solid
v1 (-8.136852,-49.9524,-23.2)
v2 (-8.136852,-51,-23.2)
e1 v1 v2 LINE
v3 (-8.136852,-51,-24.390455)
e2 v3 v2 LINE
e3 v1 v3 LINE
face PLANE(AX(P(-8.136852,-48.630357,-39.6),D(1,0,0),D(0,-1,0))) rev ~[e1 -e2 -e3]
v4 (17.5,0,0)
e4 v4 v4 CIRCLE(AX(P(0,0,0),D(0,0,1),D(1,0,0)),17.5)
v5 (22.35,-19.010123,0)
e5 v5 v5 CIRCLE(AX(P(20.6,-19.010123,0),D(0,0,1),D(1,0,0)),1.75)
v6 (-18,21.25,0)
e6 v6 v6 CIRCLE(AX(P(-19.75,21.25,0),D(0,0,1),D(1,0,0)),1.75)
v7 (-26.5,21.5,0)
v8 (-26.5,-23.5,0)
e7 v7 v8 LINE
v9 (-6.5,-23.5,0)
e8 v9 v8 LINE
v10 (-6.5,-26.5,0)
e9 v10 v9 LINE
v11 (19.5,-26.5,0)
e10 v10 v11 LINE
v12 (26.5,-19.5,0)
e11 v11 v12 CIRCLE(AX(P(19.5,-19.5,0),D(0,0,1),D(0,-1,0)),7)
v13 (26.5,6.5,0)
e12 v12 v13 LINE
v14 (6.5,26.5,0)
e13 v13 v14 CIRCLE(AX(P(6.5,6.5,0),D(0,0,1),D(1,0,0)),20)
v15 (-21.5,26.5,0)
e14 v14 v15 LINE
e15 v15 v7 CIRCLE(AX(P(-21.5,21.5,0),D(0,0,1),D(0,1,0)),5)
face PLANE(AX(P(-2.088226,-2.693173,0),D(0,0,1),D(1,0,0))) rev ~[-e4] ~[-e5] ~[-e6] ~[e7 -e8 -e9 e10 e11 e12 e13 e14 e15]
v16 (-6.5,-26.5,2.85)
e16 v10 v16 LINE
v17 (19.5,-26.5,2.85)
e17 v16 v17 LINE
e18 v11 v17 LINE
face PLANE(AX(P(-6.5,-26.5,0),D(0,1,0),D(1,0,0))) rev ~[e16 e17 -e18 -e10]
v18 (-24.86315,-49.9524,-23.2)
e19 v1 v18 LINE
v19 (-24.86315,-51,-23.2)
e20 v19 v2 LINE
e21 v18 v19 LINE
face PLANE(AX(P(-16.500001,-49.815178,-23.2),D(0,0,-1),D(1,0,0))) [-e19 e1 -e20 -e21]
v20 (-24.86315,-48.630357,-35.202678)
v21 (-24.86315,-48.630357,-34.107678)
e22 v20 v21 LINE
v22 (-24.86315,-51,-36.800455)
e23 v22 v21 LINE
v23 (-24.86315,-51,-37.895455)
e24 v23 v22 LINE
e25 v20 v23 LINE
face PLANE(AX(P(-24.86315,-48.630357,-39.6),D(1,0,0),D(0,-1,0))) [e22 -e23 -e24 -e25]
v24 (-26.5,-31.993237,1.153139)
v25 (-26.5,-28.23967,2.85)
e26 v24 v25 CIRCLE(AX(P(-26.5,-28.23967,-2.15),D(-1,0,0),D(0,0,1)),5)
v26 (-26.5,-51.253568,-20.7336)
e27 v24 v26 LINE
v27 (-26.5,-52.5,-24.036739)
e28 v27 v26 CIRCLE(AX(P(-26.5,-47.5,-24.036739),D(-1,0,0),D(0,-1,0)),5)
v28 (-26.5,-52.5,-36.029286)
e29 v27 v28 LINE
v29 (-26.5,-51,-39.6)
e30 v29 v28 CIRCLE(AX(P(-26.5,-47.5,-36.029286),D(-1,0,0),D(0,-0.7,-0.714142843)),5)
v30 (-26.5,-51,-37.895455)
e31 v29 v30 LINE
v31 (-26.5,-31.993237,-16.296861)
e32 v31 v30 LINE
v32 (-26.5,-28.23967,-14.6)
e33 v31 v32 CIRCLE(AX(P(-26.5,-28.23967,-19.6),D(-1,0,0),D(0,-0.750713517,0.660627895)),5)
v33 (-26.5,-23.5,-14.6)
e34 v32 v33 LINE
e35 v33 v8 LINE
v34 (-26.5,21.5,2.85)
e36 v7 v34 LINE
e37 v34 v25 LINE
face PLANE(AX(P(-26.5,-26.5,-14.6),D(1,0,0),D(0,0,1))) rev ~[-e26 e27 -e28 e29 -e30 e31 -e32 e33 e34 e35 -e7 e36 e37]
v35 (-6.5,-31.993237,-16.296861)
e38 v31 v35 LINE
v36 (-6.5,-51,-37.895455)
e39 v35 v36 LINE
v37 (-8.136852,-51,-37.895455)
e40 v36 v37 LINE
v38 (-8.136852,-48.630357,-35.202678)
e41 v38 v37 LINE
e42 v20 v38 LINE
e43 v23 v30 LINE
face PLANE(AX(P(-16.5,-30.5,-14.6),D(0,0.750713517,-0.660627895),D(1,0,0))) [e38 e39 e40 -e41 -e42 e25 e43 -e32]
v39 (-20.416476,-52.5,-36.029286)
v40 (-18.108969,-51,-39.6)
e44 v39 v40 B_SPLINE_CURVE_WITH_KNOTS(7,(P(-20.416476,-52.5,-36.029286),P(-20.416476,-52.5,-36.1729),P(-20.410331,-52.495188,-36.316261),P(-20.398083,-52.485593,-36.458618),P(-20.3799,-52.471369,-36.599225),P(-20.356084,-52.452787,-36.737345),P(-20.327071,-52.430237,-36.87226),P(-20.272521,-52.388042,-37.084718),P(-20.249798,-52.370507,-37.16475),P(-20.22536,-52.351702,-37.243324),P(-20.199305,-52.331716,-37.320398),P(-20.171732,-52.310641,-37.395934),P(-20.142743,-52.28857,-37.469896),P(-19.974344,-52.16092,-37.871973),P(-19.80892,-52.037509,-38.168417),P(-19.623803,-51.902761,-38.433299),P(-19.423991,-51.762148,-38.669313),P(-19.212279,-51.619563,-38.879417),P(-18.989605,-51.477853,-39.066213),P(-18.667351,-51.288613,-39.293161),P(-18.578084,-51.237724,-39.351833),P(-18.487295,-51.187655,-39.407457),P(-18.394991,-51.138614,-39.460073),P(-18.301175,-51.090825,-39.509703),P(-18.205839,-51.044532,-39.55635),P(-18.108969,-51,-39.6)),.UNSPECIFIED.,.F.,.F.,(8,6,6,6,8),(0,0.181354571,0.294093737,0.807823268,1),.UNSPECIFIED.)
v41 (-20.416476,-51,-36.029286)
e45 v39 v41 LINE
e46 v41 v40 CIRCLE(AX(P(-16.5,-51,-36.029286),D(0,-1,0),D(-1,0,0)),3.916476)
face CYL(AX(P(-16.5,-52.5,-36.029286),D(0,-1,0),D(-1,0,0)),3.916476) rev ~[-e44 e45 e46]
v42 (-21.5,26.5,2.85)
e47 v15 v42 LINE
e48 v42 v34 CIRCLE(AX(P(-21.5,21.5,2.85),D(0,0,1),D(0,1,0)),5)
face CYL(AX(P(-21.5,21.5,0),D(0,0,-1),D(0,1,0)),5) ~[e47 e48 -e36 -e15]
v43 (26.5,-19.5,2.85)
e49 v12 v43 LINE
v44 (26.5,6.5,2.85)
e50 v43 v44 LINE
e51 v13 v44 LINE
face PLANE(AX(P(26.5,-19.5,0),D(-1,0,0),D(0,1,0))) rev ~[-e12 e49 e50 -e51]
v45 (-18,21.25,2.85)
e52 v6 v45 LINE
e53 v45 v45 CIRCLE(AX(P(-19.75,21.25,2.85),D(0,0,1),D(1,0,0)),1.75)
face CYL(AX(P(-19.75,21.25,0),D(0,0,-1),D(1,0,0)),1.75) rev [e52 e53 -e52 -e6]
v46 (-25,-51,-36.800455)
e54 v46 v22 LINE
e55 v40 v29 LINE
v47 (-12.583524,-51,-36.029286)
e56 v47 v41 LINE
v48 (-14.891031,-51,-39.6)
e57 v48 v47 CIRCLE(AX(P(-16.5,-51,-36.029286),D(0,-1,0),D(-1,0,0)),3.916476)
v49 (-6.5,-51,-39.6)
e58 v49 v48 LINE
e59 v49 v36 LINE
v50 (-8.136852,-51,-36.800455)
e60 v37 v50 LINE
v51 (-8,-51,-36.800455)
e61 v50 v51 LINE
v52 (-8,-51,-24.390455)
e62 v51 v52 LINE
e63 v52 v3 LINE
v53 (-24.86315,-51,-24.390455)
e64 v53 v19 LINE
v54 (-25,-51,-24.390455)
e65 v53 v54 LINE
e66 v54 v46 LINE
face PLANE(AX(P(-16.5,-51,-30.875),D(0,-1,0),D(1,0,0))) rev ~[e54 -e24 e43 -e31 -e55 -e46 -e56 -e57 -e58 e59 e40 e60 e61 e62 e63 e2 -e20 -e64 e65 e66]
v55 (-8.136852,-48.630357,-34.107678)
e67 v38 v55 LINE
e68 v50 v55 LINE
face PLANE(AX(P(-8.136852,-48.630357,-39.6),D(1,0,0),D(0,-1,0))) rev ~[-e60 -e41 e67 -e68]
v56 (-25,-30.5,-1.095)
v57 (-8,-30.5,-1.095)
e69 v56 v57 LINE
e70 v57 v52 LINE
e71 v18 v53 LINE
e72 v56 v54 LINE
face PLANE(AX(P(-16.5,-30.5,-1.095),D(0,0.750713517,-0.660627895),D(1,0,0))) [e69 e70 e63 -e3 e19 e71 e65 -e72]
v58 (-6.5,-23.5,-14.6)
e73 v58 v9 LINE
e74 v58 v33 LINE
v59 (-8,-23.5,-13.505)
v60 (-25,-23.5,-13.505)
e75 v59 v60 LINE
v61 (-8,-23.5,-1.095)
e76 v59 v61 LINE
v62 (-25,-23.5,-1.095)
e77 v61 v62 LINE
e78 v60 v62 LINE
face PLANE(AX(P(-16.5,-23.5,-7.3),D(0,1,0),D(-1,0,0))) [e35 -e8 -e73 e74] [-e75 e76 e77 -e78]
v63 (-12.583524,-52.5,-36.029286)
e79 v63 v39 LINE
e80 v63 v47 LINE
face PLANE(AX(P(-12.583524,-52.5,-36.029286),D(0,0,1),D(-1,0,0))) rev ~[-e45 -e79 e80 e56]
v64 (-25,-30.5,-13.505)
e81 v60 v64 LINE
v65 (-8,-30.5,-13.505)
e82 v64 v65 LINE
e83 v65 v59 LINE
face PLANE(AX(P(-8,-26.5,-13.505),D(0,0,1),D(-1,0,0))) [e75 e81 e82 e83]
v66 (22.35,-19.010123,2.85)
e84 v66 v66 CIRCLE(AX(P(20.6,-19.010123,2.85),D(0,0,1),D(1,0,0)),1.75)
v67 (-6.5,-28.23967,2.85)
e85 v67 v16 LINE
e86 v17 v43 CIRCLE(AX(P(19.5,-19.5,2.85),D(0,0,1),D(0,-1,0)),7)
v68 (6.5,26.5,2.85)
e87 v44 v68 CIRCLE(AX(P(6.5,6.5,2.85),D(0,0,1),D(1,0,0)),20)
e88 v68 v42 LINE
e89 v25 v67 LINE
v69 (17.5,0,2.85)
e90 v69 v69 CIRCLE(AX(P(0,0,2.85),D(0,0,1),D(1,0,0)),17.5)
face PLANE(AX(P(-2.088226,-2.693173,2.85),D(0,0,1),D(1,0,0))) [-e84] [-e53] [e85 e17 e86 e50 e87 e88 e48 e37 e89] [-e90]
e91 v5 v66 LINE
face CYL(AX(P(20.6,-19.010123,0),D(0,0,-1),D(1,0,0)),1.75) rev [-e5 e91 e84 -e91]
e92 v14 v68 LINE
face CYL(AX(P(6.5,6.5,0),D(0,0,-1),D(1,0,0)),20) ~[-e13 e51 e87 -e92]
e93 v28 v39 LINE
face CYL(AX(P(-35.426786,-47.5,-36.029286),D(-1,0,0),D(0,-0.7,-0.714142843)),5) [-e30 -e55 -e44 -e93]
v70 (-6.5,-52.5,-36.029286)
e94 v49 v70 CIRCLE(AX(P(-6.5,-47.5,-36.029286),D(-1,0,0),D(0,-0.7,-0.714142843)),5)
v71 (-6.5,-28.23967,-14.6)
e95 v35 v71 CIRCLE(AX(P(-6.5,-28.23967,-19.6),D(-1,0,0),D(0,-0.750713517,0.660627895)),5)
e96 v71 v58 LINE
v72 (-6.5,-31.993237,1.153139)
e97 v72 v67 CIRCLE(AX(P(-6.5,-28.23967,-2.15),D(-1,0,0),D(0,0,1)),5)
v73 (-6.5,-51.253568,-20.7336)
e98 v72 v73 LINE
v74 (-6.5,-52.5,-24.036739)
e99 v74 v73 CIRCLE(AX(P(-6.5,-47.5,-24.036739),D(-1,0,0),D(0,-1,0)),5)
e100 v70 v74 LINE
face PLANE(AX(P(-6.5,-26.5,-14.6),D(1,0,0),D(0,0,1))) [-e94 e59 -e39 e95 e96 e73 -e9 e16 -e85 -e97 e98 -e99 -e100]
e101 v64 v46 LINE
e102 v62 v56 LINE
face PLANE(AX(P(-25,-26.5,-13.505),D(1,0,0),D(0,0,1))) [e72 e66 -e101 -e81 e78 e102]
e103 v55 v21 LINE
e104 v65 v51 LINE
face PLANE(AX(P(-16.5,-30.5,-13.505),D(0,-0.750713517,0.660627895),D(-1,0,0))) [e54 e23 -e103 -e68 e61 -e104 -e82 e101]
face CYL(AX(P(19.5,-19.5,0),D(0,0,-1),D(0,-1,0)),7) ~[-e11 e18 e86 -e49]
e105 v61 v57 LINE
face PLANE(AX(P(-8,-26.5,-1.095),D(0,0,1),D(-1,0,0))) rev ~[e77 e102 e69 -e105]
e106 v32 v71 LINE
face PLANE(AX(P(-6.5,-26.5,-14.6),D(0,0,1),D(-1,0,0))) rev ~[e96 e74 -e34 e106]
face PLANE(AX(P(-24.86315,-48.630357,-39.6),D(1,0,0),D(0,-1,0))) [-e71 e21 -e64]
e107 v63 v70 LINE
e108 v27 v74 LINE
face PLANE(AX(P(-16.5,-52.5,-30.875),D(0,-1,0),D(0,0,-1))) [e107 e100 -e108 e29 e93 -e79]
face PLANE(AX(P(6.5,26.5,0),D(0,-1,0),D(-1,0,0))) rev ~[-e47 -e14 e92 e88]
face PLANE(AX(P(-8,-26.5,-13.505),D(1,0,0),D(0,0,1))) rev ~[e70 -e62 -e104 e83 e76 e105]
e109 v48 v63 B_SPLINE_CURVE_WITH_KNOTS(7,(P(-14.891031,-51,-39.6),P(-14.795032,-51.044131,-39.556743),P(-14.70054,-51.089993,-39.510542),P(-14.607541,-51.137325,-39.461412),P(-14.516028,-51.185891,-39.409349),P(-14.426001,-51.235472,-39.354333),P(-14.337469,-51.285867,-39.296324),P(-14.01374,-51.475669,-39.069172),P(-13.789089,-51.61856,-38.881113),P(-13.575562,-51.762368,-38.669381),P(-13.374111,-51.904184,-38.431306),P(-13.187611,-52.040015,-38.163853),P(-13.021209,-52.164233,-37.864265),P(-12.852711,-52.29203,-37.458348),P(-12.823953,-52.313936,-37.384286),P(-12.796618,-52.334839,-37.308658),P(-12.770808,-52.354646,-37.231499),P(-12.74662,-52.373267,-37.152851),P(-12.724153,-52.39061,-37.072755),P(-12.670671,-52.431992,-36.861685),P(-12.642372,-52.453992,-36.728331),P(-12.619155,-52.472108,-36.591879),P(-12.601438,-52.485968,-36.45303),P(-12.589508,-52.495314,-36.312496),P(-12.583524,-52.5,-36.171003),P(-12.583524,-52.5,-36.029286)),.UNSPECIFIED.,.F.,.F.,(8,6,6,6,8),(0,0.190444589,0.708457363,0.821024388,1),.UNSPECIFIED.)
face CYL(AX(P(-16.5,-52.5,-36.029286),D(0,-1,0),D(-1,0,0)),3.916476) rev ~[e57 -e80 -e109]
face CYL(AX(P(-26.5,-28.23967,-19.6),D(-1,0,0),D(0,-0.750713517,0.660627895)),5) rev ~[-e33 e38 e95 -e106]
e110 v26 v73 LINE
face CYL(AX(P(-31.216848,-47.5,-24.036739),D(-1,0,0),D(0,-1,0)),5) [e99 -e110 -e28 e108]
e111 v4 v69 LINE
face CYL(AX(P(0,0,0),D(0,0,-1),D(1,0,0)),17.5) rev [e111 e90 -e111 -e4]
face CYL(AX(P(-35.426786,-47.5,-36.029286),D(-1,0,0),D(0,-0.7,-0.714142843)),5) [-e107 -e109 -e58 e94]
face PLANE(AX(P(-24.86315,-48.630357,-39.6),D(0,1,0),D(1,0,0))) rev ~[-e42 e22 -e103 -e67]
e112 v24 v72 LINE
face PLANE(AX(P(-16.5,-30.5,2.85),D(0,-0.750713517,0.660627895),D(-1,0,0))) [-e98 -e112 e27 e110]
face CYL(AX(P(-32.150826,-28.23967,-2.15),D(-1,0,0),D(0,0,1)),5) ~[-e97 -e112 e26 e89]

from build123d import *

# Parameters (mm, degrees)
F0_R         = 1.75
F0_R_2       = 17.5
F1_DEPTH     = 2.85
F2_W         = 20
F2_H         = 4
F3_DEPTH     = 14.6
F4_W         = 17
F4_H         = 12.41
F5_DEPTH     = 25
F3_FACE1_W   = 20
F3_FACE1_H   = 17.45
F3_FACE1_W_2 = 17
F3_FACE1_H_2 = 12.41
F9_W         = 20
F9_H         = 17.45
F10_DEPTH    = 1.5
F11_W        = 16.7262982869
F11_H        = 2.3696432114
F12_DEPTH    = 16.4
F13_T1_DEPTH = 20
F13_T3_DEPTH = 31.3016516107
F13_T5_DEPTH = 29.4336950122
F13_T7_DEPTH = 37.8535710714
F4_W_2       = 20
F4_H_2       = 14.6
F14_DEPTH    = 3
F16_DEPTH    = 25


# Not quite as in the source:
# - a fillet or chamfer that OpenCascade refuses, or shapes differently, is made with other operations: its cross-section is extruded or revolved along the edge and cut away or added


with BuildPart() as f1:
    # F0 (on Top) → F1 (new body)
    with BuildSketch(Plane.XY):
        with BuildLine():
            Line((-6.5, -26.5), (19.5, -26.5))
            ThreePointArc((19.5, -26.5), (24.4497474683, -24.4497474683), (26.5, -19.5))
            Line((26.5, -19.5), (26.5, 6.5))
            ThreePointArc((26.5, 6.5), (20.6421356237, 20.6421356237), (6.5, 26.5))
            Line((6.5, 26.5), (-21.5, 26.5))
            ThreePointArc((-21.5, 26.5), (-25.0355339059, 25.0355339059), (-26.5, 21.5))
            Line((-26.5, 21.5), (-26.5, -26.5))
            Line((-26.5, -26.5), (-26.5, -30.5))
            Line((-26.5, -30.5), (-6.5, -30.5))
            Line((-6.5, -30.5), (-6.5, -26.5))
        make_face()
        with Locations((20.6, -19.0101229506)):
            Circle(F0_R, mode=Mode.SUBTRACT)
        with Locations((-19.75, 21.25)):
            Circle(F0_R, mode=Mode.SUBTRACT)
        Circle(F0_R_2, mode=Mode.SUBTRACT)
    extrude(amount=F1_DEPTH)

    # F2 (on face) → F3 (join)
    with BuildSketch(Plane(origin=(0, 0, 0), x_dir=(1, 0, 0), z_dir=(0, 0, -1))):
        with Locations((-16.5, 28.5)):
            Rectangle(F2_W, F2_H)
    extrude(amount=F3_DEPTH)

    # F4 (on face) → F5 (cut)
    with BuildSketch(Plane(origin=(0, -26.5, 0), x_dir=(-1, 0, 0), z_dir=(0, 1, 0))):
        with Locations((16.5, -7.3)):
            Rectangle(F4_W, F4_H)
    extrude(amount=-F5_DEPTH, mode=Mode.SUBTRACT)

    # F8: sweep along a path in F7
    with BuildLine(Plane.YZ.offset(-16.5)) as f8_path:
        Line((-30.5838297752, -0.1396118733), (-52.5838297752, -25.1396118733))
    # F3_face1 (on face) → F8 (sweep)
    with BuildSketch(Plane(origin=(-16.5, -30.5, -3.6969789176), x_dir=(1, 0, 0), z_dir=(0, -1, 0))):
        with Locations((0, -2.1780210824)):
            Rectangle(F3_FACE1_W, F3_FACE1_H)
        with Locations((0, -3.6030210824)):
            Rectangle(F3_FACE1_W_2, F3_FACE1_H_2, mode=Mode.SUBTRACT)
    sweep(path=f8_path.line)

    # F9 (on face) → F10 (join)
    with BuildSketch(Plane.XZ.offset(52.5)):
        with Locations((-16.5, -30.875)):
            Rectangle(F9_W, F9_H)
    extrude(amount=-F10_DEPTH)

    # F11 (on face) → F12 (cut)
    with BuildSketch(Plane(origin=(0, 0, -39.6), x_dir=(1, 0, 0), z_dir=(0, 0, -1))):
        with Locations((-16.5000008565, 49.8151783943)):
            Rectangle(F11_W, F11_H)
    extrude(amount=-F12_DEPTH, mode=Mode.SUBTRACT)

    # F13: fillet of radius 5 on 4 edges, made by hand

    # F13_s2 → F13_t1 (join)
    with BuildSketch(Plane.YZ.offset(-26.5)):
        with BuildLine():
            ThreePointArc((-31.9932372625, -16.2968605255), (-30.299318025, -15.0439217867), (-28.2396696779, -14.6))
            Line((-28.2396696779, -14.6), (-30.5, -14.6))
            Line((-30.5, -14.6), (-31.9932372625, -16.2968605255))
        make_face()
    extrude(amount=F13_T1_DEPTH)

    # F13_s4 → F13_t3 (cut)
    with BuildSketch(Plane.YZ.offset(-32.1508258053)):
        with BuildLine():
            ThreePointArc((-28.2396696779, 2.85), (-30.299318025, 2.4060782133), (-31.9932372625, 1.1531394745))
            Line((-31.9932372625, 1.1531394745), (-30.5, 2.85))
            Line((-30.5, 2.85), (-28.2396696779, 2.85))
        make_face()
    extrude(amount=F13_T3_DEPTH, mode=Mode.SUBTRACT)

    # F13_s6 → F13_t5 (cut)
    with BuildSketch(Plane.YZ.offset(-31.2168475061)):
        with BuildLine():
            ThreePointArc((-52.5, -24.0367390024), (-52.1780251134, -22.2714965153), (-51.2535675846, -20.733599528))
            Line((-51.2535675846, -20.733599528), (-52.5, -22.15))
            Line((-52.5, -22.15), (-52.5, -24.0367390024))
        make_face()
    extrude(amount=F13_T5_DEPTH, mode=Mode.SUBTRACT)

    # F13_s8 → F13_t7 (cut)
    with BuildSketch(Plane.YZ.offset(-35.4267855357)):
        with BuildLine():
            ThreePointArc((-51, -39.6), (-52.1097722286, -37.9657774588), (-52.5, -36.0292857857))
            Line((-52.5, -36.0292857857), (-52.5, -39.6))
            Line((-52.5, -39.6), (-51, -39.6))
        make_face()
    extrude(amount=F13_T7_DEPTH, mode=Mode.SUBTRACT)

    # F4 (on face) → F14 (join)
    with BuildSketch(Plane(origin=(0, -26.5, 0), x_dir=(-1, 0, 0), z_dir=(0, 1, 0))):
        with Locations((16.5, -7.3)):
            Rectangle(F4_W_2, F4_H_2)
        with Locations((16.5, -7.3)):
            Rectangle(F4_W, F4_H, mode=Mode.SUBTRACT)
    extrude(amount=F14_DEPTH)

    # F15 (on face) → F16 (cut)
    with BuildSketch(Plane.XZ.offset(52.5)):
        with BuildLine():
            Line((-12.5835244641, -36.0292857857), (-20.4164755359, -36.0292857857))
            ThreePointArc((-20.4164755359, -36.0292857857), (-16.5, -39.9457613216), (-12.5835244641, -36.0292857857))
        make_face()
    extrude(amount=-F16_DEPTH, mode=Mode.SUBTRACT)


solid = f1.part
